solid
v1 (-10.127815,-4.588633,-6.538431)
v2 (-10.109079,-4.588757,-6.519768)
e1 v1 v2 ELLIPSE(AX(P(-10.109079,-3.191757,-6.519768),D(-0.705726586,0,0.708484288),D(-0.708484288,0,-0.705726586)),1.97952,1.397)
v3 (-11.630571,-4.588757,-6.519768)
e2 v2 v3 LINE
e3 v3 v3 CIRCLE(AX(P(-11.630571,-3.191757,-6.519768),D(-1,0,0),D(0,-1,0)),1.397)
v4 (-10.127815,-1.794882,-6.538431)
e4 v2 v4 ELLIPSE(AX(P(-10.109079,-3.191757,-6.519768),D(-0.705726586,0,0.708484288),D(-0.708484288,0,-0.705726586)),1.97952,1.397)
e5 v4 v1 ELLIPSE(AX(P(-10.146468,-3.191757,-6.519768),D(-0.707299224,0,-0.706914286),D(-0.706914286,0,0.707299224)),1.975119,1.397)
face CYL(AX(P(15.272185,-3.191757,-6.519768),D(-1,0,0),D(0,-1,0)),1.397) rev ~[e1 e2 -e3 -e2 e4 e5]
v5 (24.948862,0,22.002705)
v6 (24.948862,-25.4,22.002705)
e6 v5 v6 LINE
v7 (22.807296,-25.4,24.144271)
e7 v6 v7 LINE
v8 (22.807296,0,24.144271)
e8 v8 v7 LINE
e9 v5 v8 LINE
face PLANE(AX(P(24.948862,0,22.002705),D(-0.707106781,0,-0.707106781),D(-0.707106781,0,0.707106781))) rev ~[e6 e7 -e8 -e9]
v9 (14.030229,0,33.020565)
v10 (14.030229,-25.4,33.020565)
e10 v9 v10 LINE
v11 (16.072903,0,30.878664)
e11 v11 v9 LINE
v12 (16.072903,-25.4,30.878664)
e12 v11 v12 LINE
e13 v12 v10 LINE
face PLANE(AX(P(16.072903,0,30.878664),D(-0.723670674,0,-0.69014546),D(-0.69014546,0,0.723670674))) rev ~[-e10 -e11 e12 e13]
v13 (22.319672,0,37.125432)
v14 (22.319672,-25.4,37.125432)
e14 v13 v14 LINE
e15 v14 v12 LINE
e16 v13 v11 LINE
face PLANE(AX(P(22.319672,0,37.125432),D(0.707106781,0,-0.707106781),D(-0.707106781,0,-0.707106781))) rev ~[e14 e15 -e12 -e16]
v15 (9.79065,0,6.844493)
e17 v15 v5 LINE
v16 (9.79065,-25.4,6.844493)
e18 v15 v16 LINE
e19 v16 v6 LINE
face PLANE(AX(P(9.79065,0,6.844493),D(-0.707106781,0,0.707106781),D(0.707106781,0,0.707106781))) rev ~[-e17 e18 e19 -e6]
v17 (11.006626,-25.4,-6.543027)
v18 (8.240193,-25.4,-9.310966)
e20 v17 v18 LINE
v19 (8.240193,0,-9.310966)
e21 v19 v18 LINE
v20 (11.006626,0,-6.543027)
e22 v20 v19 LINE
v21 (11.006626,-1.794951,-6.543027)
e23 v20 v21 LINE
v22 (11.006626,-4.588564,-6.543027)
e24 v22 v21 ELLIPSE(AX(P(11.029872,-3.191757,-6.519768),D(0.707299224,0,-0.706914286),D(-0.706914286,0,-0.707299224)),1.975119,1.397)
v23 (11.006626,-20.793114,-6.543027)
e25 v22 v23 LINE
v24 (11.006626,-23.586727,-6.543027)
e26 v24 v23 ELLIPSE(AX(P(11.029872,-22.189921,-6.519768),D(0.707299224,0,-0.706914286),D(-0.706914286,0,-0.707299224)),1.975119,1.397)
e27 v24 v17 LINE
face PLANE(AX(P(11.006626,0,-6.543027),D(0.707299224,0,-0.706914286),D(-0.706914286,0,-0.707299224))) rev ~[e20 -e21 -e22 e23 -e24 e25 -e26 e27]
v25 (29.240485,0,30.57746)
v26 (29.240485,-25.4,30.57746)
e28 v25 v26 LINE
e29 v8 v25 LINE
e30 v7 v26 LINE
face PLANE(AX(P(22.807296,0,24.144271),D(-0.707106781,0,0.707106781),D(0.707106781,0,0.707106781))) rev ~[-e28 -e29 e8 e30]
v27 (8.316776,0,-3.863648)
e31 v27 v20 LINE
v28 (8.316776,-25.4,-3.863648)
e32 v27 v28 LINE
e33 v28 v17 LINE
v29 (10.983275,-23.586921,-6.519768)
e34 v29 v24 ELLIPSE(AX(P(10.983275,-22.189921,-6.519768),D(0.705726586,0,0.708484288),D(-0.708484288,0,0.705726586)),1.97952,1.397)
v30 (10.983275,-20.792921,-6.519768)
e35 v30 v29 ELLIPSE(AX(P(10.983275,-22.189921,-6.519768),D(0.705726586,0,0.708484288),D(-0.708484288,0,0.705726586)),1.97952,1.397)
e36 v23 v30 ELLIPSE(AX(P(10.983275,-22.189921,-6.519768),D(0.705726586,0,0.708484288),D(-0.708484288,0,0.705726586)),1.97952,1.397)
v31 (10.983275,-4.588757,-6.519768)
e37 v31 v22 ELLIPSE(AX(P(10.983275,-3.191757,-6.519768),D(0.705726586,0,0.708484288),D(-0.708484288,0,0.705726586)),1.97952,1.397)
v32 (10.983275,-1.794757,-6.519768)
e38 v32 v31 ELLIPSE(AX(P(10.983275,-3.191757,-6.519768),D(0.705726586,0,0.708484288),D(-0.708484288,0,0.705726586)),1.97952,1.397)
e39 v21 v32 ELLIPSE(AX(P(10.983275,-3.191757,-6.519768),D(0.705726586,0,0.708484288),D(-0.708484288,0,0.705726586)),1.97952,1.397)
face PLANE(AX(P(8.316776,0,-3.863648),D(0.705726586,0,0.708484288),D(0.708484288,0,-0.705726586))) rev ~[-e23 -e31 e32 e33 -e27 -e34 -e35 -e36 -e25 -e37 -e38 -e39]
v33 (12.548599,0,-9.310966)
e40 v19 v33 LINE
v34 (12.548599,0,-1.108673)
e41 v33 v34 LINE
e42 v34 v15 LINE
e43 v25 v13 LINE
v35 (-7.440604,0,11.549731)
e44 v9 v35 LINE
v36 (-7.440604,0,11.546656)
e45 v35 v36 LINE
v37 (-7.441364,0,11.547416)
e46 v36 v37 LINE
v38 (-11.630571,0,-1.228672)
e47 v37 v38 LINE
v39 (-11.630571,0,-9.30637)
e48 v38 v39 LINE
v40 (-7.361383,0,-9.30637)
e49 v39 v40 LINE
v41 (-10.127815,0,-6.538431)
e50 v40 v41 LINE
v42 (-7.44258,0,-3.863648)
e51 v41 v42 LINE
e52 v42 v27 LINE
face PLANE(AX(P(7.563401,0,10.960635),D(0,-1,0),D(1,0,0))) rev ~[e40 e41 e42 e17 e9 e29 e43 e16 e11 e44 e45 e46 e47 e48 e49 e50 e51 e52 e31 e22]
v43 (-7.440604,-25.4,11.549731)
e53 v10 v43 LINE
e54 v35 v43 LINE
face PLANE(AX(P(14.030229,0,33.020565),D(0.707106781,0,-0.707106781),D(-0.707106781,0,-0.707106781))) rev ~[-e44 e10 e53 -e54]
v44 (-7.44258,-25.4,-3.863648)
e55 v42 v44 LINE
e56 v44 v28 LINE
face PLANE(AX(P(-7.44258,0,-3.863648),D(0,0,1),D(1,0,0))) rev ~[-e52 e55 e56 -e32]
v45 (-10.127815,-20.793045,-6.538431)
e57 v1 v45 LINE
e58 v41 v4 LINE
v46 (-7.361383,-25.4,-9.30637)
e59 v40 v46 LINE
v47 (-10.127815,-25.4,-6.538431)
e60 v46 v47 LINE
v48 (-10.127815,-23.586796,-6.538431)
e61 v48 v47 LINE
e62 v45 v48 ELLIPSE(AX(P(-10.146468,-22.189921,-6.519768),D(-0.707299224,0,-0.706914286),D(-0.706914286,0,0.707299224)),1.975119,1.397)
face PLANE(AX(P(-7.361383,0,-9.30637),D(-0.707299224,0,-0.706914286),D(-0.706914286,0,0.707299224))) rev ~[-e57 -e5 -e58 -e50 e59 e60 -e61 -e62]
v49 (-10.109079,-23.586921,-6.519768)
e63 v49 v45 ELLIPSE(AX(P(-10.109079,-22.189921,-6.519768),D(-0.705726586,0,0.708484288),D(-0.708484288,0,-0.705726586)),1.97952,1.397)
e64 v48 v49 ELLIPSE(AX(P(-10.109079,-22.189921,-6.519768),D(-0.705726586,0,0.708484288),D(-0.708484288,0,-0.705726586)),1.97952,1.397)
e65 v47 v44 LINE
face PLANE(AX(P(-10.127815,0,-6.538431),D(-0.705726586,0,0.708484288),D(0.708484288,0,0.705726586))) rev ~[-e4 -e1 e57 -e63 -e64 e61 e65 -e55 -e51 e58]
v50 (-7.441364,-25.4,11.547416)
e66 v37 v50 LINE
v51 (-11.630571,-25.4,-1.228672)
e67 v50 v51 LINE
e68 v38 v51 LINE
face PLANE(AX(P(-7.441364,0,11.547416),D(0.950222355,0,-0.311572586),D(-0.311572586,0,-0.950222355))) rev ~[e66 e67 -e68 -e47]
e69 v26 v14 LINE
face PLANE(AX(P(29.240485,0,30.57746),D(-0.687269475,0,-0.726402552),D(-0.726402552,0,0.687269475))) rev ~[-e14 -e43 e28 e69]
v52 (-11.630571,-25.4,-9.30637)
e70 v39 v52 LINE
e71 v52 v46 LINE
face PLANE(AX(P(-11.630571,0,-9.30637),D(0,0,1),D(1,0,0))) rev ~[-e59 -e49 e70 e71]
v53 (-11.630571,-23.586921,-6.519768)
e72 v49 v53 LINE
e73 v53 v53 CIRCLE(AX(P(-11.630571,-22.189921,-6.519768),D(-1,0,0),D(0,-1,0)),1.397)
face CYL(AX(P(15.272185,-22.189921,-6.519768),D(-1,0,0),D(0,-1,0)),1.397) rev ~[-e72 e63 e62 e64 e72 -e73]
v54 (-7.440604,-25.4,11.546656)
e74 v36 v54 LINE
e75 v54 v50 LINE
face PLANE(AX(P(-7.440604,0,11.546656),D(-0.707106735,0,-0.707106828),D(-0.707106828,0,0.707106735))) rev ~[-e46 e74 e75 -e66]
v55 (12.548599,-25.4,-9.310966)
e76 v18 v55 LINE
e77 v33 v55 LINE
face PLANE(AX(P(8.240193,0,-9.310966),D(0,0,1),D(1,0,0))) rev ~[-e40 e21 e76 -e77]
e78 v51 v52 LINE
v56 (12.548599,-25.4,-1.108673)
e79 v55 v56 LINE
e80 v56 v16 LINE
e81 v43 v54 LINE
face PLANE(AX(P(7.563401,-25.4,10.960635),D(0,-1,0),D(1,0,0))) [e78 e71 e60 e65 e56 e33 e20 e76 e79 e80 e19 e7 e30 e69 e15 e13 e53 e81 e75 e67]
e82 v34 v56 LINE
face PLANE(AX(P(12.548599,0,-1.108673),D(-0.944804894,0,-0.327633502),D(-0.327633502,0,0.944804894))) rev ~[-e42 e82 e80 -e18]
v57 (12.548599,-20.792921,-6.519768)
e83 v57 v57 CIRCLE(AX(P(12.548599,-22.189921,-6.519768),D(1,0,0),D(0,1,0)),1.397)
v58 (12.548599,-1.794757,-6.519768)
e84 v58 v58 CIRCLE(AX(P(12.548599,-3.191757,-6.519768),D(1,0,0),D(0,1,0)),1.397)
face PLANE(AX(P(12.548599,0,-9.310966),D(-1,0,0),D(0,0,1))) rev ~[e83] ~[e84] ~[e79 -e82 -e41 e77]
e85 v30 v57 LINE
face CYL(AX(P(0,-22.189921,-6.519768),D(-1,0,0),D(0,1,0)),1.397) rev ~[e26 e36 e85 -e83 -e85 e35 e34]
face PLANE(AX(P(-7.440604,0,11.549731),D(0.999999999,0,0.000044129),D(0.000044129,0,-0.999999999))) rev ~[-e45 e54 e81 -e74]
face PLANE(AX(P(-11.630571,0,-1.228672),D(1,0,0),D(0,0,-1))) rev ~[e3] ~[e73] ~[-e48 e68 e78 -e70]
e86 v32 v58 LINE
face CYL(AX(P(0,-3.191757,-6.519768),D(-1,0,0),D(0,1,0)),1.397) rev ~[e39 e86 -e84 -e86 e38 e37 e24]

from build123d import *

# Parameters (mm, degrees)
F1_DEPTH = 25.4
F3_D     = 2.794
F3_DEPTH = 25.4
F3_TIP   = 0.8394022848
F4_D     = 2.794
F4_DEPTH = 25.4
F4_START = 10.1278152
F4_TIP   = 0.8394022848


# Not quite as in the source:
# - ends of sketch curves that miss each other by under 0.0002 mm in the source are joined
# - a feature names something its author has since deleted; it is built from what else it names


with BuildPart() as f1:
    # F0 (on Front) → F1 (new body)
    with BuildSketch(Plane.XZ):
        Polygon((11.0066256276, -6.5430273301), (8.240193387, -9.310965985), (12.5485987193, -9.310965985), (12.5485987193, -1.1086727812), (9.7906497979, 6.8444932552), (24.9488617122, 22.0027051695), (22.8072959293, 24.1442709524), (29.2404852808, 30.5774603039), (22.3196721338, 37.1254323684), (16.0729033236, 30.8786635582), (14.0302290969, 33.0205648235), (13.9806155776, 32.9709513042), (-7.4406042695, 11.5497314571), (-7.4406041338, 11.5466563515), (-7.4413635659, 11.5474157835), (-11.6305711889, -1.2286720797), (-11.6305711889, -9.3063699081), (-7.3613829189, -9.3063699081), (-10.1278151595, -6.5384312532), (-7.4425795762, -3.8636476732), (8.3167760077, -3.8636476732), align=None)
    extrude(amount=F1_DEPTH)

    # F3 (one way)
    with BuildSketch(Plane(origin=(0, 0, 0), x_dir=(0, 1, 0), z_dir=(-1, 0, 0))):
        with Locations((-22.1899207681, 6.5197679214), (-3.1917574815, 6.5197679214)):
            Circle(F3_D / 2)
    extrude(amount=-F3_DEPTH, mode=Mode.SUBTRACT)
    with Locations(Plane(origin=(0, 0, 0), x_dir=(0, 1, 0), z_dir=(-1, 0, 0))):
        with Locations((-22.1899207681, 6.5197679214), (-3.1917574815, 6.5197679214)):
            with Locations((0, 0, -(F3_DEPTH + F3_TIP / 2))):  # 118° drill point
                Cone(0, F3_D / 2, F3_TIP, mode=Mode.SUBTRACT)

    # F4
    # its depths count from where the whole tool has entered the part; down to there all is cleared
    with Locations(Plane.YZ.offset(-F4_START)):
        with Locations((-3.1917574815, -6.5197679214), (-22.1899207681, -6.5197679214)):
            Hole(F4_D / 2, depth=F4_DEPTH)
            with Locations((0, 0, -(F4_DEPTH + F4_TIP / 2))):  # 118° drill point
                Cone(0, F4_D / 2, F4_TIP, mode=Mode.SUBTRACT)


solid = f1.part
